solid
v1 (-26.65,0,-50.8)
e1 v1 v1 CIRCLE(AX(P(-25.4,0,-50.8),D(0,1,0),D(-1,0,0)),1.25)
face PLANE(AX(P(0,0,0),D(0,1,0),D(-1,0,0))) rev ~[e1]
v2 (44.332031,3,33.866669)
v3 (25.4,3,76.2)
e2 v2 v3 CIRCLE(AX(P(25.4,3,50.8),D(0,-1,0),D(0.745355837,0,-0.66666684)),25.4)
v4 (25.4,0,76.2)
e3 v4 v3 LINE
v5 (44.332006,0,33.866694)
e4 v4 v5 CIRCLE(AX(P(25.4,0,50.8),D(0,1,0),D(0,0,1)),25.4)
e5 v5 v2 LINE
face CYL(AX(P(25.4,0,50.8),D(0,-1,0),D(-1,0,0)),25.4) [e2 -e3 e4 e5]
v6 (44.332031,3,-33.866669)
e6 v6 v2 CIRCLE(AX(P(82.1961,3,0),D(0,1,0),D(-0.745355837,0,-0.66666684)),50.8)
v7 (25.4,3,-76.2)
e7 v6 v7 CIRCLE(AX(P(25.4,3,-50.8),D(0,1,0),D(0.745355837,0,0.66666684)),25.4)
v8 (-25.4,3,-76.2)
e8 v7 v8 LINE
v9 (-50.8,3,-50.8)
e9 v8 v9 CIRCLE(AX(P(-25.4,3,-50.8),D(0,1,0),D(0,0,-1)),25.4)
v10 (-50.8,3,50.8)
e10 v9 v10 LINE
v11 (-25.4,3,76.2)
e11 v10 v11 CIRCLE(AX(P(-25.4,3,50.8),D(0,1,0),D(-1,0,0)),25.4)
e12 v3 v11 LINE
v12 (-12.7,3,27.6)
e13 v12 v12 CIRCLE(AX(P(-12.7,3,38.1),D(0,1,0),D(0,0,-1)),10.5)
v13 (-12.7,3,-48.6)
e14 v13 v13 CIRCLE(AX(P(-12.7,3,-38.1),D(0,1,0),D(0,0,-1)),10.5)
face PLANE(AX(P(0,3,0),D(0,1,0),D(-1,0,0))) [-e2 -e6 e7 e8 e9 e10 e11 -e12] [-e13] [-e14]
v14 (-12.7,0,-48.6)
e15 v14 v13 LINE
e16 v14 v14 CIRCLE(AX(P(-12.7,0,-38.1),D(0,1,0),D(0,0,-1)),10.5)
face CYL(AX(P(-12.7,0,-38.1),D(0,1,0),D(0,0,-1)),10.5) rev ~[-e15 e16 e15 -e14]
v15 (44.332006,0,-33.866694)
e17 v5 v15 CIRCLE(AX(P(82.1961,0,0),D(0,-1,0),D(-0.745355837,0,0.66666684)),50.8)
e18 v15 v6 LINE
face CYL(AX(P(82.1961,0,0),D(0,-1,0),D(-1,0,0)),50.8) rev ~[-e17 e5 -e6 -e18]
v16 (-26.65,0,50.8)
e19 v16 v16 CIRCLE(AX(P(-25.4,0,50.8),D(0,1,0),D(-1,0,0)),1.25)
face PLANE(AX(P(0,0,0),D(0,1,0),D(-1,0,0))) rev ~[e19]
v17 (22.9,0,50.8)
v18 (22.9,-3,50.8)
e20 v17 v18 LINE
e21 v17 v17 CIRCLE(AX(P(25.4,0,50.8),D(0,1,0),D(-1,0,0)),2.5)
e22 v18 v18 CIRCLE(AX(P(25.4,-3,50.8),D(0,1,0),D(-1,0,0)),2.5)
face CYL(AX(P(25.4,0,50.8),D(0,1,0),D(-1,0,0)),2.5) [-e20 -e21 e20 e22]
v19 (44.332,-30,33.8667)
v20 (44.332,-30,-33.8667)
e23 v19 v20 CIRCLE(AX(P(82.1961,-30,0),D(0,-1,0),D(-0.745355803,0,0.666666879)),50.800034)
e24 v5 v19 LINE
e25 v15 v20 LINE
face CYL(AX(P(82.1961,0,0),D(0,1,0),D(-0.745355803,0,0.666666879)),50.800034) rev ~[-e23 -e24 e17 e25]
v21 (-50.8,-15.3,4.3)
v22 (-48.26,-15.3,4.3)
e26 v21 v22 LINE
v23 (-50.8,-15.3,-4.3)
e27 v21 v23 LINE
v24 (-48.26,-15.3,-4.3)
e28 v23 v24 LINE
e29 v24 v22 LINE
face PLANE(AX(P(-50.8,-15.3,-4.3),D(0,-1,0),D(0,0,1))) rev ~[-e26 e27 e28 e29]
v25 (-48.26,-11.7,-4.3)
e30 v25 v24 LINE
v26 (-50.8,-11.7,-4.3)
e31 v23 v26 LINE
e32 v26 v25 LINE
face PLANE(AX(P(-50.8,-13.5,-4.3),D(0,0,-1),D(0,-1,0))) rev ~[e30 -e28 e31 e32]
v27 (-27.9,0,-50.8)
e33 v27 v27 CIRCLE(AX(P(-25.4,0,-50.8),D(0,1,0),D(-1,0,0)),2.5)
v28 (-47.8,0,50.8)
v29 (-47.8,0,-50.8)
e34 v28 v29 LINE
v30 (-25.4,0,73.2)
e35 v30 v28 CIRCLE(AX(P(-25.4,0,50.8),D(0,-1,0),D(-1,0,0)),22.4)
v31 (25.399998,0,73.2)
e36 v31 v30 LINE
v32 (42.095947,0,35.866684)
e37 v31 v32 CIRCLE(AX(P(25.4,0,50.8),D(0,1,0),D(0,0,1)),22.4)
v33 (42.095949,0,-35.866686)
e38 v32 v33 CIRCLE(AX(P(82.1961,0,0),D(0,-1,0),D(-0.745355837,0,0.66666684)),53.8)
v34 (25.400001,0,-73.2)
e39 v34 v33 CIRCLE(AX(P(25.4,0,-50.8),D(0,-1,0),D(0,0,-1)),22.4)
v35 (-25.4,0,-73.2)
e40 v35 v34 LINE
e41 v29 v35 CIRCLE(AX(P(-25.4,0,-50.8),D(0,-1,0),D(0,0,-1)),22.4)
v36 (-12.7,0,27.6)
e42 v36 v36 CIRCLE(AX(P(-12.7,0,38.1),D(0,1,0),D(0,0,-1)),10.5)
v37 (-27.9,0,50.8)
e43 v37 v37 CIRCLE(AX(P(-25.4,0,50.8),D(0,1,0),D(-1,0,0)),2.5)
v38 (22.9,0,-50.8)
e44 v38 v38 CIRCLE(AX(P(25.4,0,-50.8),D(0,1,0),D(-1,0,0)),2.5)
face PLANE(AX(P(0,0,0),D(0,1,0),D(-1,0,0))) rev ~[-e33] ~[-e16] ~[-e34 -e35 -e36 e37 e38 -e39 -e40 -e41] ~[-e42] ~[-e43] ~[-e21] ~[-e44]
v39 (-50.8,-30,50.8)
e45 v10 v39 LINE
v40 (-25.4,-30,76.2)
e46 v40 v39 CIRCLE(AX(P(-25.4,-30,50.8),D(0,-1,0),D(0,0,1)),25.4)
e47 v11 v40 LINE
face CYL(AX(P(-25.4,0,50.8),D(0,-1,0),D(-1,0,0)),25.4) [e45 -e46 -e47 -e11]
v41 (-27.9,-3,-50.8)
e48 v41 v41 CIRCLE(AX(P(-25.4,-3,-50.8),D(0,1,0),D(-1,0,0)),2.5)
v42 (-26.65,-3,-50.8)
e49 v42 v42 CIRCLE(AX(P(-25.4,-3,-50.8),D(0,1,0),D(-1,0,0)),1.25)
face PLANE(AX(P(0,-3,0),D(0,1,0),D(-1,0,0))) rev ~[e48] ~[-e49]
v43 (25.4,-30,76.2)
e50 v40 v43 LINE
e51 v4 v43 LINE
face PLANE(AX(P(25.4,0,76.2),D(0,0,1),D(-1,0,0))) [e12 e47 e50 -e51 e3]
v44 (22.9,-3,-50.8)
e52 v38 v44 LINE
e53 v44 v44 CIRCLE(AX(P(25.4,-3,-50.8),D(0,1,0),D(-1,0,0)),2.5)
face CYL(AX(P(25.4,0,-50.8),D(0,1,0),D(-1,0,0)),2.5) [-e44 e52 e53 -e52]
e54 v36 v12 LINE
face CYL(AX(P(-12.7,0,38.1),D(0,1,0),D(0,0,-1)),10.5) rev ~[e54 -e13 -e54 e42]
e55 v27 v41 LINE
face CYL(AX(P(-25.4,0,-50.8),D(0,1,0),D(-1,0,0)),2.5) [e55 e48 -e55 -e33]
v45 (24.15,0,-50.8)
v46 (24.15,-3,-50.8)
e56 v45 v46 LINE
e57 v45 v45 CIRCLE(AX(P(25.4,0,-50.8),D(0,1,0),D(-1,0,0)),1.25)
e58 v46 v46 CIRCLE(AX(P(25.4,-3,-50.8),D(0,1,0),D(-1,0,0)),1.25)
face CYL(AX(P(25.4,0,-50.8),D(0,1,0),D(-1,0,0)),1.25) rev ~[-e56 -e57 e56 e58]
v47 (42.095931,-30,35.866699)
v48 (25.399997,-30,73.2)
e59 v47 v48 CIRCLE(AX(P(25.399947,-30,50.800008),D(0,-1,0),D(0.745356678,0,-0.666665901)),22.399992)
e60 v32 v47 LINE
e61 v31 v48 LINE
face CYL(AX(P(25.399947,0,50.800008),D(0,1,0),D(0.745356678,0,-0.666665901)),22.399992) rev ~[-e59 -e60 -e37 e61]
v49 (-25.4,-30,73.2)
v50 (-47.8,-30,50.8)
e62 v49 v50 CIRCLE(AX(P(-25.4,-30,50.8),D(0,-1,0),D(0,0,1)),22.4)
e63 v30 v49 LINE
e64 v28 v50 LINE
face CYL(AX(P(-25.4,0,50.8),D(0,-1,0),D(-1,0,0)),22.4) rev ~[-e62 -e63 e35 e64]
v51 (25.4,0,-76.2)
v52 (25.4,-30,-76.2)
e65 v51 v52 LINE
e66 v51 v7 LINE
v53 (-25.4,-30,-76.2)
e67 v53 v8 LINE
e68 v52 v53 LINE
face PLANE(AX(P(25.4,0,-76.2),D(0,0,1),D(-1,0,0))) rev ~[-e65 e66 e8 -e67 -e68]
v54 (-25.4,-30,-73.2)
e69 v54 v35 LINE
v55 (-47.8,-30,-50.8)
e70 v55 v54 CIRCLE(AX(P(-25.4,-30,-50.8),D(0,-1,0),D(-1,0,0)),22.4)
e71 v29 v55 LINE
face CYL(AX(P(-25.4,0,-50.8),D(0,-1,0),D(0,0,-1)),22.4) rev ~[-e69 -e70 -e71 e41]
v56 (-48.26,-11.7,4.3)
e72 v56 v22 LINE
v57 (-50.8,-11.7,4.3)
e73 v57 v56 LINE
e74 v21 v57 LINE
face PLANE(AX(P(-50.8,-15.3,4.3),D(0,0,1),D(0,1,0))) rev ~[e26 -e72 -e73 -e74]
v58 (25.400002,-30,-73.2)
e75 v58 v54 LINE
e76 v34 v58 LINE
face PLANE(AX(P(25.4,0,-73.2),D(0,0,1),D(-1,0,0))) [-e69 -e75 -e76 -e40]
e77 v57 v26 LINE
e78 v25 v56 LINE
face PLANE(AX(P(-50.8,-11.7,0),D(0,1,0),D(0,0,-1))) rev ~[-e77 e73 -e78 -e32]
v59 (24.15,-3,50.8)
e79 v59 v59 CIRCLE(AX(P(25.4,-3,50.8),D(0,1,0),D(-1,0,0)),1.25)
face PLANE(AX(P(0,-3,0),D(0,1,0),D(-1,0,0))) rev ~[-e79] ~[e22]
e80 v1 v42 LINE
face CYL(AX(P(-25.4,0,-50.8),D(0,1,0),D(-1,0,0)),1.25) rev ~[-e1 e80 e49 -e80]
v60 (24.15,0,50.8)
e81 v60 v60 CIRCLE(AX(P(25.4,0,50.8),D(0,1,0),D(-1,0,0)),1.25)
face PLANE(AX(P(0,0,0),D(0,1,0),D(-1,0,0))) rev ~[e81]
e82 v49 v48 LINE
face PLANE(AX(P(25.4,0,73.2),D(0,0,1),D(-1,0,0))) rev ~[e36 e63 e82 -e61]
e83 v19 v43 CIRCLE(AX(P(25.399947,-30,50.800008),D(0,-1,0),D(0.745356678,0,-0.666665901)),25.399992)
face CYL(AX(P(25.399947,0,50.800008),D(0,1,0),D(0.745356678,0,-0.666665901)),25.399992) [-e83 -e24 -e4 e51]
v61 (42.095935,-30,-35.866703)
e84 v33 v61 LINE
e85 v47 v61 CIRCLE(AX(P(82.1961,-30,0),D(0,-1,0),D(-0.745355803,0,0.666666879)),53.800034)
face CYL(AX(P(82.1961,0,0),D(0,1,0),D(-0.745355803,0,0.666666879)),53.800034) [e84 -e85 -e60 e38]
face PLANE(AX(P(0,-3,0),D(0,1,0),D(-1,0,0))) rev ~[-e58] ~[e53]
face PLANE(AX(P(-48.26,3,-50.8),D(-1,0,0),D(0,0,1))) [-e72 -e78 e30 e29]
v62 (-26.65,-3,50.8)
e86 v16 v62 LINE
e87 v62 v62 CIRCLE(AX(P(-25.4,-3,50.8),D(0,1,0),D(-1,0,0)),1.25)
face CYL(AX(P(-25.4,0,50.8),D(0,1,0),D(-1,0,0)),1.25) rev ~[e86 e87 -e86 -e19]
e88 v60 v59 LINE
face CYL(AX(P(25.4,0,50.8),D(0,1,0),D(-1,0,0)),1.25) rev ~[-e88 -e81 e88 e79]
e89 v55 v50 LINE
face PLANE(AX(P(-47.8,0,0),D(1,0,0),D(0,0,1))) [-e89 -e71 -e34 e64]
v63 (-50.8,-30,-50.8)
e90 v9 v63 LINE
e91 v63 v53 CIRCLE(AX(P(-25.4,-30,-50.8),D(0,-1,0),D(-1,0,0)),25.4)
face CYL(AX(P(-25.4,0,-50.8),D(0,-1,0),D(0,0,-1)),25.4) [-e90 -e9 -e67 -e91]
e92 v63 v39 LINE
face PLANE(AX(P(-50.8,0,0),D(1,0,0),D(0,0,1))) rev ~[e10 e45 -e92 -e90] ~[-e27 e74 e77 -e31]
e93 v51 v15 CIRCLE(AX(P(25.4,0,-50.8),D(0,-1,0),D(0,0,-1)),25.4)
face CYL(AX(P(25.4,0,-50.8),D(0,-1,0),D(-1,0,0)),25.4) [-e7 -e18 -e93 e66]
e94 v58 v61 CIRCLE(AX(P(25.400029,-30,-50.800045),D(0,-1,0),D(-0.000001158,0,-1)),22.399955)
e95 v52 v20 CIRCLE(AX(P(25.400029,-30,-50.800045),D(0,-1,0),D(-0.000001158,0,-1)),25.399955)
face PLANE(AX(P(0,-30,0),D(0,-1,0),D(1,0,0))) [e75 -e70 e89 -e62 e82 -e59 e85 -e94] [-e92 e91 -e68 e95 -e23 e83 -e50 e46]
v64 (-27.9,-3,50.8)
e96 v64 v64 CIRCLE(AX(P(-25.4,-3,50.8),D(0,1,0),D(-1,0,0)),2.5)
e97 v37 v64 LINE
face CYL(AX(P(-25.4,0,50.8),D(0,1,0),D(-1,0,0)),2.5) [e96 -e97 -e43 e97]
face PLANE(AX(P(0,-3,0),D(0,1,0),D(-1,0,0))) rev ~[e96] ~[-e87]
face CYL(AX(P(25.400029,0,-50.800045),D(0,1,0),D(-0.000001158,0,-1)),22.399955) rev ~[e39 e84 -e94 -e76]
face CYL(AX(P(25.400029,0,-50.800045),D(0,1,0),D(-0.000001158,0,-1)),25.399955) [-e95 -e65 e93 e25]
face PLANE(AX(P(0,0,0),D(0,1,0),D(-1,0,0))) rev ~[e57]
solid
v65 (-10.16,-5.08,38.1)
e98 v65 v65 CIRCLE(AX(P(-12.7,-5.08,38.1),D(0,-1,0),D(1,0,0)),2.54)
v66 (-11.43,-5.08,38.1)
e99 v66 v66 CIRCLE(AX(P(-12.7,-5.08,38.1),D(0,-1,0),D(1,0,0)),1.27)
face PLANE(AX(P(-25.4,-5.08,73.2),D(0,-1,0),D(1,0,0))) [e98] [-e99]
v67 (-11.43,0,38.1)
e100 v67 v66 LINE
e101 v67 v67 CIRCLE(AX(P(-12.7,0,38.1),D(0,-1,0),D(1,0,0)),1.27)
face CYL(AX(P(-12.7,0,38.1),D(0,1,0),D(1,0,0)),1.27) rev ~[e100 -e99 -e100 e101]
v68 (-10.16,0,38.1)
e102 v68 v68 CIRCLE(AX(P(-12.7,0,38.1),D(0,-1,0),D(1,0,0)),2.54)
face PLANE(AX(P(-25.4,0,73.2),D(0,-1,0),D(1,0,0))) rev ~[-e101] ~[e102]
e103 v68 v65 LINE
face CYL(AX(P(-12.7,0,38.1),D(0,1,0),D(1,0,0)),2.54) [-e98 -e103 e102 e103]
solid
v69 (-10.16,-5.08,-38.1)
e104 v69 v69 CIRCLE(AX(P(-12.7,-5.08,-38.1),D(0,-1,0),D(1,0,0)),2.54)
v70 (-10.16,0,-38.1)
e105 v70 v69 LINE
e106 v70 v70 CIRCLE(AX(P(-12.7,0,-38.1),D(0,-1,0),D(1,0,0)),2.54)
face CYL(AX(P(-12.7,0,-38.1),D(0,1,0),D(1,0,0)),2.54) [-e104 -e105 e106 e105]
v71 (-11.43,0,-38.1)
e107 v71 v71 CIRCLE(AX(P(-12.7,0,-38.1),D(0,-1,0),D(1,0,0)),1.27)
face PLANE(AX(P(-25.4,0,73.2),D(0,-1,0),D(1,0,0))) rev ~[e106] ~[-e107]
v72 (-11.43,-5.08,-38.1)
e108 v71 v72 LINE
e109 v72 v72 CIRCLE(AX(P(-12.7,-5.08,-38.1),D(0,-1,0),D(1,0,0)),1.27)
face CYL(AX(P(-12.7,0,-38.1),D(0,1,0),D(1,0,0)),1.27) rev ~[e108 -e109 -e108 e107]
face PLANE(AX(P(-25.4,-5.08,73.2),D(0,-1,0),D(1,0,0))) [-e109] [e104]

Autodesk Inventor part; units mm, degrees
ref_plane "YZ Plane" through (0, 0, 0) normal (1, 0, 0) x (0, 1, 0)
ref_plane "XZ Plane" through (0, 0, 0) normal (0, 1, 0) x (-1, 0, 0)
ref_plane "XY Plane" through (0, 0, 0) normal (0, 0, 1) x (1, 0, 0)
sketch "Sketch1" plane through (0, 0, 0) normal (0, 1, 0) x (-1, 0, 0)
  line L0 (-25.4, 76.2) -> (25.4, 76.2)
  line L1 (50.8, 76.2) -> (-50.8, 76.2)
  line L2 (-50.8, 50.8) -> (-50.8, -50.8)
  line L3 (50.8, 76.2) -> (-50.8, 76.2)
  line L4 (-25.4, -76.2) -> (25.4, -76.2)
  line L5 (50.8, -50.8) -> (50.8, 50.8)
  arc A0 (50.8, 50.8) -> (25.4, 76.2) centre (25.4, 50.8) ccw
  arc A1 (25.4, -76.2) -> (50.8, -50.8) centre (25.4, -50.8) ccw
  arc A2 (-50.8, -50.8) -> (-25.4, -76.2) centre (-25.4, -50.8) ccw
  arc A3 (-25.4, 76.2) -> (-50.8, 50.8) centre (-25.4, 50.8) ccw
  circle A4 centre (-25.4, 50.8) radius 25.4
  circle A5 centre (-25.4, -50.8) radius 25.4
  circle A6 centre (-50.8, 0) radius 31.3961
  circle A7 centre (-82.1961, 0) radius 50.8
  circle A8 centre (25.4, -50.8) radius 2.5
  circle A9 centre (25.4, -50.8) radius 1.25
  circle A10 centre (25.4, 50.8) radius 2.5
  circle A11 centre (25.4, 50.8) radius 1.25
  circle A12 centre (-25.4, 50.8) radius 2.5
  circle A13 centre (-25.4, 50.8) radius 1.25
  circle A14 centre (-25.4, -50.8) radius 2.5
  circle A15 centre (-25.4, -50.8) radius 1.25
  line L6 (-31.3961, 0) -> (50.8, 0)
  point P0 (-36.7592, 28.0815)
  point P1 (-36.7592, -28.0815)
  point P2 (12.7, 38.1)
  point P3 (12.7, -38.1)
  point P4 (-50.8, -31.3961)
  point P5 (-50.8, 31.3961)
  point P6 (-44.332, -33.8667)
  point P7 (-44.332, 33.8667)
  point P8 (9.7019, 0)
  point P9 (0.3879, -59.1619)
  point P10 (-13.7063, -28.2519)
  dimension "d6" = 101.6
  dimension "d21" = 25.4
  dimension "d68" = 2.5
  dimension "d69" = 2.5
  dimension "d70" = 2.5
  dimension "d71" = 2.5
  dimension "d72" = 5
  dimension "d73" = 5
  dimension "d74" = 5
  dimension "d75" = 5
extrude "Extrusion4" add sketch "Sketch1" along normal blind 3 contours A4 A3 | L0 A0 L5 L6 A6 A4 | A4 A6 A7 | A6 L6 A7 | L5 A1 L4 A5 A6 L6 | A6 A7 L6 | A5 A2 | A7 A6 A5 | A8 | A9 | A10 | A11 | A12 | A13 | A14 | A15
hole "Hole3" at (-12.7, 0, 38.1) at (-12.7, 0, -38.1) direction (0, 1, 0) diameter 21 depth 25.4 tip angle 118
sketch "Sketch5" plane through (0, 0, 0) normal (0, -1, 0) x (1, 0, 0)
  arc A0 (36.7592, 28.0815) -> (36.7592, -28.0815) centre (50.8, 0) ccw projected
  arc A1 (36.7592, 28.0815) -> (36.7592, -28.0815) centre (50.8, 0) ccw
  arc A2 (44.332, 33.8667) -> (25.4, 76.2) centre (25.4, 50.8) ccw projected
  arc A3 (36.7592, 28.0815) -> (25.4, 76.2) centre (25.4, 50.8) ccw
  arc A4 (25.4, -76.2) -> (44.332, -33.8667) centre (25.4, -50.8) ccw projected
  arc A5 (25.4, -76.2) -> (36.7592, -28.0815) centre (25.4, -50.8) ccw
  arc A6 (-25.4, 76.2) -> (-50.8, 50.8) centre (-25.4, 50.8) ccw projected
  line L0 (-50.8, -50.8) -> (-50.8, 50.8) projected
  arc A7 (-25.4, 76.2) -> (-50.8, 50.8) centre (-25.4, 50.8) ccw
  arc A8 (-50.8, -50.8) -> (-25.4, -76.2) centre (-25.4, -50.8) ccw projected
  arc A9 (-50.8, -50.8) -> (-25.4, -76.2) centre (-25.4, -50.8) ccw
  line L1 (-25.4, 76.2) -> (25.4, 76.2) projected
  line L2 (25.4, 76.2) -> (-25.4, 76.2)
  line L3 (25.4, -76.2) -> (-25.4, -76.2) projected
  line L4 (25.4, -76.2) -> (-25.4, -76.2)
  line L5 (-50.8, 50.8) -> (-50.8, -50.8)
  arc A10 (44.332, 33.8667) -> (25.4, 76.2) centre (25.4, 50.8) ccw
  arc A11 (44.332, 33.8667) -> (44.332, -33.8667) centre (82.1961, 0) ccw projected
  arc A12 (44.332, 33.8667) -> (44.332, -33.8667) centre (82.1961, 0) ccw
  arc A13 (25.4, -76.2) -> (44.332, -33.8667) centre (25.4, -50.8) ccw
  arc A14 (-50.8, -50.8) -> (-25.4, -76.2) centre (-25.4, -50.8) ccw
  arc A15 (-25.4, 76.2) -> (-50.8, 50.8) centre (-25.4, 50.8) ccw projected
  arc A16 (-25.4, 76.2) -> (-50.8, 50.8) centre (-25.4, 50.8) ccw
  line L6 (-25.4, 76.2) -> (25.4, 76.2)
  line L7 (-50.8, 50.8) -> (-50.8, -50.8)
  line L8 (-25.4, -76.2) -> (25.4, -76.2)
  point P0 (0, 0)
  point P1 (-12.7, 38.1)
  point P2 (-12.7, -38.1)
extrude "Extrusion5" add sketch "Sketch5" along normal blind 30
shell "Shell1" thickness 3 removed faces 3 at (-23.4013, -30, 0) at (-13.5376, 0, 41.4983) at (-15.9531, 0, -34.6)
sketch "Sketch6" plane through (-25.4, 0, 73.2) normal (0, -1, 0) x (1, 0, 0)
  circle A0 centre (12.7, -111.3) radius 10.5 projected
  circle A1 centre (12.7, -35.1) radius 10.5 projected
  circle A2 centre (12.7, -111.3) radius 1.27
  circle A3 centre (12.7, -35.1) radius 1.27
  circle A4 centre (12.7, -111.3) radius 2.54
  circle A5 centre (12.7, -35.1) radius 2.54
  point P0 (25.4, -73.2)
  dimension "d45" = 2.54
  dimension "d46" = 2.54
  dimension "d47" = 5.08
  dimension "d48" = 5.08
extrude "Extrusion6" add sketch "Sketch6" along normal blind 5.08 contours A4 | A5
sketch "Sketch8" plane through (-50.8, 3, -50.8) normal (-1, 0, 0) x (0, 0, 1)
  line L0 (0, -33) -> (101.6, -33) projected
  line L1 (0, 0) -> (101.6, 0)
  line L2 (101.6, 0) -> (101.6, -33)
  line L3 (101.6, -33) -> (0, -33)
  line L4 (0, -33) -> (0, 0)
  line L5 (50.8, 0) -> (50.8, -33)
  line L6 (0, -16.5) -> (101.6, -16.5)
  line L7 (50.8, -16.5) -> (55.1, -16.5)
  line L8 (55.1, -16.5) -> (55.1, -14.7)
  line L9 (50.8, -16.5) -> (46.5, -16.5)
  line L10 (46.5, -16.5) -> (46.5, -18.3)
  line L11 (55.1, -14.7) -> (46.5, -14.7)
  line L12 (46.5, -14.7) -> (46.5, -18.3)
  line L13 (46.5, -18.3) -> (55.1, -18.3)
  line L14 (55.1, -18.3) -> (55.1, -14.7)
  point P0 (50.8, -3)
  dimension "d82" = 4.3
  dimension "d83" = 4.3
  dimension "d84" = 1.8
  dimension "d85" = 1.8
extrude "Extrusion8" cut sketch "Sketch8" against normal blind 2.54 contours L13 L10 L6 L5 | L5 L6 L14 L13 | L12 L11 L5 L6 | L5 L11 L8 L6
extrude "Extrusion9" add sketch "Sketch1" against normal blind 3 contours A8 | A10 | A12 | A14
equation "\"d69\" = d68"
equation "\"d70\" = d68"
equation "\"d71\" = d68"
equation "\"d73\" = d72"
equation "\"d74\" = d73"
equation "\"d75\" = d72"
equation "\"d83\" = d82"
equation "\"d85\" = d84"
properties part number "ControllerTop"
